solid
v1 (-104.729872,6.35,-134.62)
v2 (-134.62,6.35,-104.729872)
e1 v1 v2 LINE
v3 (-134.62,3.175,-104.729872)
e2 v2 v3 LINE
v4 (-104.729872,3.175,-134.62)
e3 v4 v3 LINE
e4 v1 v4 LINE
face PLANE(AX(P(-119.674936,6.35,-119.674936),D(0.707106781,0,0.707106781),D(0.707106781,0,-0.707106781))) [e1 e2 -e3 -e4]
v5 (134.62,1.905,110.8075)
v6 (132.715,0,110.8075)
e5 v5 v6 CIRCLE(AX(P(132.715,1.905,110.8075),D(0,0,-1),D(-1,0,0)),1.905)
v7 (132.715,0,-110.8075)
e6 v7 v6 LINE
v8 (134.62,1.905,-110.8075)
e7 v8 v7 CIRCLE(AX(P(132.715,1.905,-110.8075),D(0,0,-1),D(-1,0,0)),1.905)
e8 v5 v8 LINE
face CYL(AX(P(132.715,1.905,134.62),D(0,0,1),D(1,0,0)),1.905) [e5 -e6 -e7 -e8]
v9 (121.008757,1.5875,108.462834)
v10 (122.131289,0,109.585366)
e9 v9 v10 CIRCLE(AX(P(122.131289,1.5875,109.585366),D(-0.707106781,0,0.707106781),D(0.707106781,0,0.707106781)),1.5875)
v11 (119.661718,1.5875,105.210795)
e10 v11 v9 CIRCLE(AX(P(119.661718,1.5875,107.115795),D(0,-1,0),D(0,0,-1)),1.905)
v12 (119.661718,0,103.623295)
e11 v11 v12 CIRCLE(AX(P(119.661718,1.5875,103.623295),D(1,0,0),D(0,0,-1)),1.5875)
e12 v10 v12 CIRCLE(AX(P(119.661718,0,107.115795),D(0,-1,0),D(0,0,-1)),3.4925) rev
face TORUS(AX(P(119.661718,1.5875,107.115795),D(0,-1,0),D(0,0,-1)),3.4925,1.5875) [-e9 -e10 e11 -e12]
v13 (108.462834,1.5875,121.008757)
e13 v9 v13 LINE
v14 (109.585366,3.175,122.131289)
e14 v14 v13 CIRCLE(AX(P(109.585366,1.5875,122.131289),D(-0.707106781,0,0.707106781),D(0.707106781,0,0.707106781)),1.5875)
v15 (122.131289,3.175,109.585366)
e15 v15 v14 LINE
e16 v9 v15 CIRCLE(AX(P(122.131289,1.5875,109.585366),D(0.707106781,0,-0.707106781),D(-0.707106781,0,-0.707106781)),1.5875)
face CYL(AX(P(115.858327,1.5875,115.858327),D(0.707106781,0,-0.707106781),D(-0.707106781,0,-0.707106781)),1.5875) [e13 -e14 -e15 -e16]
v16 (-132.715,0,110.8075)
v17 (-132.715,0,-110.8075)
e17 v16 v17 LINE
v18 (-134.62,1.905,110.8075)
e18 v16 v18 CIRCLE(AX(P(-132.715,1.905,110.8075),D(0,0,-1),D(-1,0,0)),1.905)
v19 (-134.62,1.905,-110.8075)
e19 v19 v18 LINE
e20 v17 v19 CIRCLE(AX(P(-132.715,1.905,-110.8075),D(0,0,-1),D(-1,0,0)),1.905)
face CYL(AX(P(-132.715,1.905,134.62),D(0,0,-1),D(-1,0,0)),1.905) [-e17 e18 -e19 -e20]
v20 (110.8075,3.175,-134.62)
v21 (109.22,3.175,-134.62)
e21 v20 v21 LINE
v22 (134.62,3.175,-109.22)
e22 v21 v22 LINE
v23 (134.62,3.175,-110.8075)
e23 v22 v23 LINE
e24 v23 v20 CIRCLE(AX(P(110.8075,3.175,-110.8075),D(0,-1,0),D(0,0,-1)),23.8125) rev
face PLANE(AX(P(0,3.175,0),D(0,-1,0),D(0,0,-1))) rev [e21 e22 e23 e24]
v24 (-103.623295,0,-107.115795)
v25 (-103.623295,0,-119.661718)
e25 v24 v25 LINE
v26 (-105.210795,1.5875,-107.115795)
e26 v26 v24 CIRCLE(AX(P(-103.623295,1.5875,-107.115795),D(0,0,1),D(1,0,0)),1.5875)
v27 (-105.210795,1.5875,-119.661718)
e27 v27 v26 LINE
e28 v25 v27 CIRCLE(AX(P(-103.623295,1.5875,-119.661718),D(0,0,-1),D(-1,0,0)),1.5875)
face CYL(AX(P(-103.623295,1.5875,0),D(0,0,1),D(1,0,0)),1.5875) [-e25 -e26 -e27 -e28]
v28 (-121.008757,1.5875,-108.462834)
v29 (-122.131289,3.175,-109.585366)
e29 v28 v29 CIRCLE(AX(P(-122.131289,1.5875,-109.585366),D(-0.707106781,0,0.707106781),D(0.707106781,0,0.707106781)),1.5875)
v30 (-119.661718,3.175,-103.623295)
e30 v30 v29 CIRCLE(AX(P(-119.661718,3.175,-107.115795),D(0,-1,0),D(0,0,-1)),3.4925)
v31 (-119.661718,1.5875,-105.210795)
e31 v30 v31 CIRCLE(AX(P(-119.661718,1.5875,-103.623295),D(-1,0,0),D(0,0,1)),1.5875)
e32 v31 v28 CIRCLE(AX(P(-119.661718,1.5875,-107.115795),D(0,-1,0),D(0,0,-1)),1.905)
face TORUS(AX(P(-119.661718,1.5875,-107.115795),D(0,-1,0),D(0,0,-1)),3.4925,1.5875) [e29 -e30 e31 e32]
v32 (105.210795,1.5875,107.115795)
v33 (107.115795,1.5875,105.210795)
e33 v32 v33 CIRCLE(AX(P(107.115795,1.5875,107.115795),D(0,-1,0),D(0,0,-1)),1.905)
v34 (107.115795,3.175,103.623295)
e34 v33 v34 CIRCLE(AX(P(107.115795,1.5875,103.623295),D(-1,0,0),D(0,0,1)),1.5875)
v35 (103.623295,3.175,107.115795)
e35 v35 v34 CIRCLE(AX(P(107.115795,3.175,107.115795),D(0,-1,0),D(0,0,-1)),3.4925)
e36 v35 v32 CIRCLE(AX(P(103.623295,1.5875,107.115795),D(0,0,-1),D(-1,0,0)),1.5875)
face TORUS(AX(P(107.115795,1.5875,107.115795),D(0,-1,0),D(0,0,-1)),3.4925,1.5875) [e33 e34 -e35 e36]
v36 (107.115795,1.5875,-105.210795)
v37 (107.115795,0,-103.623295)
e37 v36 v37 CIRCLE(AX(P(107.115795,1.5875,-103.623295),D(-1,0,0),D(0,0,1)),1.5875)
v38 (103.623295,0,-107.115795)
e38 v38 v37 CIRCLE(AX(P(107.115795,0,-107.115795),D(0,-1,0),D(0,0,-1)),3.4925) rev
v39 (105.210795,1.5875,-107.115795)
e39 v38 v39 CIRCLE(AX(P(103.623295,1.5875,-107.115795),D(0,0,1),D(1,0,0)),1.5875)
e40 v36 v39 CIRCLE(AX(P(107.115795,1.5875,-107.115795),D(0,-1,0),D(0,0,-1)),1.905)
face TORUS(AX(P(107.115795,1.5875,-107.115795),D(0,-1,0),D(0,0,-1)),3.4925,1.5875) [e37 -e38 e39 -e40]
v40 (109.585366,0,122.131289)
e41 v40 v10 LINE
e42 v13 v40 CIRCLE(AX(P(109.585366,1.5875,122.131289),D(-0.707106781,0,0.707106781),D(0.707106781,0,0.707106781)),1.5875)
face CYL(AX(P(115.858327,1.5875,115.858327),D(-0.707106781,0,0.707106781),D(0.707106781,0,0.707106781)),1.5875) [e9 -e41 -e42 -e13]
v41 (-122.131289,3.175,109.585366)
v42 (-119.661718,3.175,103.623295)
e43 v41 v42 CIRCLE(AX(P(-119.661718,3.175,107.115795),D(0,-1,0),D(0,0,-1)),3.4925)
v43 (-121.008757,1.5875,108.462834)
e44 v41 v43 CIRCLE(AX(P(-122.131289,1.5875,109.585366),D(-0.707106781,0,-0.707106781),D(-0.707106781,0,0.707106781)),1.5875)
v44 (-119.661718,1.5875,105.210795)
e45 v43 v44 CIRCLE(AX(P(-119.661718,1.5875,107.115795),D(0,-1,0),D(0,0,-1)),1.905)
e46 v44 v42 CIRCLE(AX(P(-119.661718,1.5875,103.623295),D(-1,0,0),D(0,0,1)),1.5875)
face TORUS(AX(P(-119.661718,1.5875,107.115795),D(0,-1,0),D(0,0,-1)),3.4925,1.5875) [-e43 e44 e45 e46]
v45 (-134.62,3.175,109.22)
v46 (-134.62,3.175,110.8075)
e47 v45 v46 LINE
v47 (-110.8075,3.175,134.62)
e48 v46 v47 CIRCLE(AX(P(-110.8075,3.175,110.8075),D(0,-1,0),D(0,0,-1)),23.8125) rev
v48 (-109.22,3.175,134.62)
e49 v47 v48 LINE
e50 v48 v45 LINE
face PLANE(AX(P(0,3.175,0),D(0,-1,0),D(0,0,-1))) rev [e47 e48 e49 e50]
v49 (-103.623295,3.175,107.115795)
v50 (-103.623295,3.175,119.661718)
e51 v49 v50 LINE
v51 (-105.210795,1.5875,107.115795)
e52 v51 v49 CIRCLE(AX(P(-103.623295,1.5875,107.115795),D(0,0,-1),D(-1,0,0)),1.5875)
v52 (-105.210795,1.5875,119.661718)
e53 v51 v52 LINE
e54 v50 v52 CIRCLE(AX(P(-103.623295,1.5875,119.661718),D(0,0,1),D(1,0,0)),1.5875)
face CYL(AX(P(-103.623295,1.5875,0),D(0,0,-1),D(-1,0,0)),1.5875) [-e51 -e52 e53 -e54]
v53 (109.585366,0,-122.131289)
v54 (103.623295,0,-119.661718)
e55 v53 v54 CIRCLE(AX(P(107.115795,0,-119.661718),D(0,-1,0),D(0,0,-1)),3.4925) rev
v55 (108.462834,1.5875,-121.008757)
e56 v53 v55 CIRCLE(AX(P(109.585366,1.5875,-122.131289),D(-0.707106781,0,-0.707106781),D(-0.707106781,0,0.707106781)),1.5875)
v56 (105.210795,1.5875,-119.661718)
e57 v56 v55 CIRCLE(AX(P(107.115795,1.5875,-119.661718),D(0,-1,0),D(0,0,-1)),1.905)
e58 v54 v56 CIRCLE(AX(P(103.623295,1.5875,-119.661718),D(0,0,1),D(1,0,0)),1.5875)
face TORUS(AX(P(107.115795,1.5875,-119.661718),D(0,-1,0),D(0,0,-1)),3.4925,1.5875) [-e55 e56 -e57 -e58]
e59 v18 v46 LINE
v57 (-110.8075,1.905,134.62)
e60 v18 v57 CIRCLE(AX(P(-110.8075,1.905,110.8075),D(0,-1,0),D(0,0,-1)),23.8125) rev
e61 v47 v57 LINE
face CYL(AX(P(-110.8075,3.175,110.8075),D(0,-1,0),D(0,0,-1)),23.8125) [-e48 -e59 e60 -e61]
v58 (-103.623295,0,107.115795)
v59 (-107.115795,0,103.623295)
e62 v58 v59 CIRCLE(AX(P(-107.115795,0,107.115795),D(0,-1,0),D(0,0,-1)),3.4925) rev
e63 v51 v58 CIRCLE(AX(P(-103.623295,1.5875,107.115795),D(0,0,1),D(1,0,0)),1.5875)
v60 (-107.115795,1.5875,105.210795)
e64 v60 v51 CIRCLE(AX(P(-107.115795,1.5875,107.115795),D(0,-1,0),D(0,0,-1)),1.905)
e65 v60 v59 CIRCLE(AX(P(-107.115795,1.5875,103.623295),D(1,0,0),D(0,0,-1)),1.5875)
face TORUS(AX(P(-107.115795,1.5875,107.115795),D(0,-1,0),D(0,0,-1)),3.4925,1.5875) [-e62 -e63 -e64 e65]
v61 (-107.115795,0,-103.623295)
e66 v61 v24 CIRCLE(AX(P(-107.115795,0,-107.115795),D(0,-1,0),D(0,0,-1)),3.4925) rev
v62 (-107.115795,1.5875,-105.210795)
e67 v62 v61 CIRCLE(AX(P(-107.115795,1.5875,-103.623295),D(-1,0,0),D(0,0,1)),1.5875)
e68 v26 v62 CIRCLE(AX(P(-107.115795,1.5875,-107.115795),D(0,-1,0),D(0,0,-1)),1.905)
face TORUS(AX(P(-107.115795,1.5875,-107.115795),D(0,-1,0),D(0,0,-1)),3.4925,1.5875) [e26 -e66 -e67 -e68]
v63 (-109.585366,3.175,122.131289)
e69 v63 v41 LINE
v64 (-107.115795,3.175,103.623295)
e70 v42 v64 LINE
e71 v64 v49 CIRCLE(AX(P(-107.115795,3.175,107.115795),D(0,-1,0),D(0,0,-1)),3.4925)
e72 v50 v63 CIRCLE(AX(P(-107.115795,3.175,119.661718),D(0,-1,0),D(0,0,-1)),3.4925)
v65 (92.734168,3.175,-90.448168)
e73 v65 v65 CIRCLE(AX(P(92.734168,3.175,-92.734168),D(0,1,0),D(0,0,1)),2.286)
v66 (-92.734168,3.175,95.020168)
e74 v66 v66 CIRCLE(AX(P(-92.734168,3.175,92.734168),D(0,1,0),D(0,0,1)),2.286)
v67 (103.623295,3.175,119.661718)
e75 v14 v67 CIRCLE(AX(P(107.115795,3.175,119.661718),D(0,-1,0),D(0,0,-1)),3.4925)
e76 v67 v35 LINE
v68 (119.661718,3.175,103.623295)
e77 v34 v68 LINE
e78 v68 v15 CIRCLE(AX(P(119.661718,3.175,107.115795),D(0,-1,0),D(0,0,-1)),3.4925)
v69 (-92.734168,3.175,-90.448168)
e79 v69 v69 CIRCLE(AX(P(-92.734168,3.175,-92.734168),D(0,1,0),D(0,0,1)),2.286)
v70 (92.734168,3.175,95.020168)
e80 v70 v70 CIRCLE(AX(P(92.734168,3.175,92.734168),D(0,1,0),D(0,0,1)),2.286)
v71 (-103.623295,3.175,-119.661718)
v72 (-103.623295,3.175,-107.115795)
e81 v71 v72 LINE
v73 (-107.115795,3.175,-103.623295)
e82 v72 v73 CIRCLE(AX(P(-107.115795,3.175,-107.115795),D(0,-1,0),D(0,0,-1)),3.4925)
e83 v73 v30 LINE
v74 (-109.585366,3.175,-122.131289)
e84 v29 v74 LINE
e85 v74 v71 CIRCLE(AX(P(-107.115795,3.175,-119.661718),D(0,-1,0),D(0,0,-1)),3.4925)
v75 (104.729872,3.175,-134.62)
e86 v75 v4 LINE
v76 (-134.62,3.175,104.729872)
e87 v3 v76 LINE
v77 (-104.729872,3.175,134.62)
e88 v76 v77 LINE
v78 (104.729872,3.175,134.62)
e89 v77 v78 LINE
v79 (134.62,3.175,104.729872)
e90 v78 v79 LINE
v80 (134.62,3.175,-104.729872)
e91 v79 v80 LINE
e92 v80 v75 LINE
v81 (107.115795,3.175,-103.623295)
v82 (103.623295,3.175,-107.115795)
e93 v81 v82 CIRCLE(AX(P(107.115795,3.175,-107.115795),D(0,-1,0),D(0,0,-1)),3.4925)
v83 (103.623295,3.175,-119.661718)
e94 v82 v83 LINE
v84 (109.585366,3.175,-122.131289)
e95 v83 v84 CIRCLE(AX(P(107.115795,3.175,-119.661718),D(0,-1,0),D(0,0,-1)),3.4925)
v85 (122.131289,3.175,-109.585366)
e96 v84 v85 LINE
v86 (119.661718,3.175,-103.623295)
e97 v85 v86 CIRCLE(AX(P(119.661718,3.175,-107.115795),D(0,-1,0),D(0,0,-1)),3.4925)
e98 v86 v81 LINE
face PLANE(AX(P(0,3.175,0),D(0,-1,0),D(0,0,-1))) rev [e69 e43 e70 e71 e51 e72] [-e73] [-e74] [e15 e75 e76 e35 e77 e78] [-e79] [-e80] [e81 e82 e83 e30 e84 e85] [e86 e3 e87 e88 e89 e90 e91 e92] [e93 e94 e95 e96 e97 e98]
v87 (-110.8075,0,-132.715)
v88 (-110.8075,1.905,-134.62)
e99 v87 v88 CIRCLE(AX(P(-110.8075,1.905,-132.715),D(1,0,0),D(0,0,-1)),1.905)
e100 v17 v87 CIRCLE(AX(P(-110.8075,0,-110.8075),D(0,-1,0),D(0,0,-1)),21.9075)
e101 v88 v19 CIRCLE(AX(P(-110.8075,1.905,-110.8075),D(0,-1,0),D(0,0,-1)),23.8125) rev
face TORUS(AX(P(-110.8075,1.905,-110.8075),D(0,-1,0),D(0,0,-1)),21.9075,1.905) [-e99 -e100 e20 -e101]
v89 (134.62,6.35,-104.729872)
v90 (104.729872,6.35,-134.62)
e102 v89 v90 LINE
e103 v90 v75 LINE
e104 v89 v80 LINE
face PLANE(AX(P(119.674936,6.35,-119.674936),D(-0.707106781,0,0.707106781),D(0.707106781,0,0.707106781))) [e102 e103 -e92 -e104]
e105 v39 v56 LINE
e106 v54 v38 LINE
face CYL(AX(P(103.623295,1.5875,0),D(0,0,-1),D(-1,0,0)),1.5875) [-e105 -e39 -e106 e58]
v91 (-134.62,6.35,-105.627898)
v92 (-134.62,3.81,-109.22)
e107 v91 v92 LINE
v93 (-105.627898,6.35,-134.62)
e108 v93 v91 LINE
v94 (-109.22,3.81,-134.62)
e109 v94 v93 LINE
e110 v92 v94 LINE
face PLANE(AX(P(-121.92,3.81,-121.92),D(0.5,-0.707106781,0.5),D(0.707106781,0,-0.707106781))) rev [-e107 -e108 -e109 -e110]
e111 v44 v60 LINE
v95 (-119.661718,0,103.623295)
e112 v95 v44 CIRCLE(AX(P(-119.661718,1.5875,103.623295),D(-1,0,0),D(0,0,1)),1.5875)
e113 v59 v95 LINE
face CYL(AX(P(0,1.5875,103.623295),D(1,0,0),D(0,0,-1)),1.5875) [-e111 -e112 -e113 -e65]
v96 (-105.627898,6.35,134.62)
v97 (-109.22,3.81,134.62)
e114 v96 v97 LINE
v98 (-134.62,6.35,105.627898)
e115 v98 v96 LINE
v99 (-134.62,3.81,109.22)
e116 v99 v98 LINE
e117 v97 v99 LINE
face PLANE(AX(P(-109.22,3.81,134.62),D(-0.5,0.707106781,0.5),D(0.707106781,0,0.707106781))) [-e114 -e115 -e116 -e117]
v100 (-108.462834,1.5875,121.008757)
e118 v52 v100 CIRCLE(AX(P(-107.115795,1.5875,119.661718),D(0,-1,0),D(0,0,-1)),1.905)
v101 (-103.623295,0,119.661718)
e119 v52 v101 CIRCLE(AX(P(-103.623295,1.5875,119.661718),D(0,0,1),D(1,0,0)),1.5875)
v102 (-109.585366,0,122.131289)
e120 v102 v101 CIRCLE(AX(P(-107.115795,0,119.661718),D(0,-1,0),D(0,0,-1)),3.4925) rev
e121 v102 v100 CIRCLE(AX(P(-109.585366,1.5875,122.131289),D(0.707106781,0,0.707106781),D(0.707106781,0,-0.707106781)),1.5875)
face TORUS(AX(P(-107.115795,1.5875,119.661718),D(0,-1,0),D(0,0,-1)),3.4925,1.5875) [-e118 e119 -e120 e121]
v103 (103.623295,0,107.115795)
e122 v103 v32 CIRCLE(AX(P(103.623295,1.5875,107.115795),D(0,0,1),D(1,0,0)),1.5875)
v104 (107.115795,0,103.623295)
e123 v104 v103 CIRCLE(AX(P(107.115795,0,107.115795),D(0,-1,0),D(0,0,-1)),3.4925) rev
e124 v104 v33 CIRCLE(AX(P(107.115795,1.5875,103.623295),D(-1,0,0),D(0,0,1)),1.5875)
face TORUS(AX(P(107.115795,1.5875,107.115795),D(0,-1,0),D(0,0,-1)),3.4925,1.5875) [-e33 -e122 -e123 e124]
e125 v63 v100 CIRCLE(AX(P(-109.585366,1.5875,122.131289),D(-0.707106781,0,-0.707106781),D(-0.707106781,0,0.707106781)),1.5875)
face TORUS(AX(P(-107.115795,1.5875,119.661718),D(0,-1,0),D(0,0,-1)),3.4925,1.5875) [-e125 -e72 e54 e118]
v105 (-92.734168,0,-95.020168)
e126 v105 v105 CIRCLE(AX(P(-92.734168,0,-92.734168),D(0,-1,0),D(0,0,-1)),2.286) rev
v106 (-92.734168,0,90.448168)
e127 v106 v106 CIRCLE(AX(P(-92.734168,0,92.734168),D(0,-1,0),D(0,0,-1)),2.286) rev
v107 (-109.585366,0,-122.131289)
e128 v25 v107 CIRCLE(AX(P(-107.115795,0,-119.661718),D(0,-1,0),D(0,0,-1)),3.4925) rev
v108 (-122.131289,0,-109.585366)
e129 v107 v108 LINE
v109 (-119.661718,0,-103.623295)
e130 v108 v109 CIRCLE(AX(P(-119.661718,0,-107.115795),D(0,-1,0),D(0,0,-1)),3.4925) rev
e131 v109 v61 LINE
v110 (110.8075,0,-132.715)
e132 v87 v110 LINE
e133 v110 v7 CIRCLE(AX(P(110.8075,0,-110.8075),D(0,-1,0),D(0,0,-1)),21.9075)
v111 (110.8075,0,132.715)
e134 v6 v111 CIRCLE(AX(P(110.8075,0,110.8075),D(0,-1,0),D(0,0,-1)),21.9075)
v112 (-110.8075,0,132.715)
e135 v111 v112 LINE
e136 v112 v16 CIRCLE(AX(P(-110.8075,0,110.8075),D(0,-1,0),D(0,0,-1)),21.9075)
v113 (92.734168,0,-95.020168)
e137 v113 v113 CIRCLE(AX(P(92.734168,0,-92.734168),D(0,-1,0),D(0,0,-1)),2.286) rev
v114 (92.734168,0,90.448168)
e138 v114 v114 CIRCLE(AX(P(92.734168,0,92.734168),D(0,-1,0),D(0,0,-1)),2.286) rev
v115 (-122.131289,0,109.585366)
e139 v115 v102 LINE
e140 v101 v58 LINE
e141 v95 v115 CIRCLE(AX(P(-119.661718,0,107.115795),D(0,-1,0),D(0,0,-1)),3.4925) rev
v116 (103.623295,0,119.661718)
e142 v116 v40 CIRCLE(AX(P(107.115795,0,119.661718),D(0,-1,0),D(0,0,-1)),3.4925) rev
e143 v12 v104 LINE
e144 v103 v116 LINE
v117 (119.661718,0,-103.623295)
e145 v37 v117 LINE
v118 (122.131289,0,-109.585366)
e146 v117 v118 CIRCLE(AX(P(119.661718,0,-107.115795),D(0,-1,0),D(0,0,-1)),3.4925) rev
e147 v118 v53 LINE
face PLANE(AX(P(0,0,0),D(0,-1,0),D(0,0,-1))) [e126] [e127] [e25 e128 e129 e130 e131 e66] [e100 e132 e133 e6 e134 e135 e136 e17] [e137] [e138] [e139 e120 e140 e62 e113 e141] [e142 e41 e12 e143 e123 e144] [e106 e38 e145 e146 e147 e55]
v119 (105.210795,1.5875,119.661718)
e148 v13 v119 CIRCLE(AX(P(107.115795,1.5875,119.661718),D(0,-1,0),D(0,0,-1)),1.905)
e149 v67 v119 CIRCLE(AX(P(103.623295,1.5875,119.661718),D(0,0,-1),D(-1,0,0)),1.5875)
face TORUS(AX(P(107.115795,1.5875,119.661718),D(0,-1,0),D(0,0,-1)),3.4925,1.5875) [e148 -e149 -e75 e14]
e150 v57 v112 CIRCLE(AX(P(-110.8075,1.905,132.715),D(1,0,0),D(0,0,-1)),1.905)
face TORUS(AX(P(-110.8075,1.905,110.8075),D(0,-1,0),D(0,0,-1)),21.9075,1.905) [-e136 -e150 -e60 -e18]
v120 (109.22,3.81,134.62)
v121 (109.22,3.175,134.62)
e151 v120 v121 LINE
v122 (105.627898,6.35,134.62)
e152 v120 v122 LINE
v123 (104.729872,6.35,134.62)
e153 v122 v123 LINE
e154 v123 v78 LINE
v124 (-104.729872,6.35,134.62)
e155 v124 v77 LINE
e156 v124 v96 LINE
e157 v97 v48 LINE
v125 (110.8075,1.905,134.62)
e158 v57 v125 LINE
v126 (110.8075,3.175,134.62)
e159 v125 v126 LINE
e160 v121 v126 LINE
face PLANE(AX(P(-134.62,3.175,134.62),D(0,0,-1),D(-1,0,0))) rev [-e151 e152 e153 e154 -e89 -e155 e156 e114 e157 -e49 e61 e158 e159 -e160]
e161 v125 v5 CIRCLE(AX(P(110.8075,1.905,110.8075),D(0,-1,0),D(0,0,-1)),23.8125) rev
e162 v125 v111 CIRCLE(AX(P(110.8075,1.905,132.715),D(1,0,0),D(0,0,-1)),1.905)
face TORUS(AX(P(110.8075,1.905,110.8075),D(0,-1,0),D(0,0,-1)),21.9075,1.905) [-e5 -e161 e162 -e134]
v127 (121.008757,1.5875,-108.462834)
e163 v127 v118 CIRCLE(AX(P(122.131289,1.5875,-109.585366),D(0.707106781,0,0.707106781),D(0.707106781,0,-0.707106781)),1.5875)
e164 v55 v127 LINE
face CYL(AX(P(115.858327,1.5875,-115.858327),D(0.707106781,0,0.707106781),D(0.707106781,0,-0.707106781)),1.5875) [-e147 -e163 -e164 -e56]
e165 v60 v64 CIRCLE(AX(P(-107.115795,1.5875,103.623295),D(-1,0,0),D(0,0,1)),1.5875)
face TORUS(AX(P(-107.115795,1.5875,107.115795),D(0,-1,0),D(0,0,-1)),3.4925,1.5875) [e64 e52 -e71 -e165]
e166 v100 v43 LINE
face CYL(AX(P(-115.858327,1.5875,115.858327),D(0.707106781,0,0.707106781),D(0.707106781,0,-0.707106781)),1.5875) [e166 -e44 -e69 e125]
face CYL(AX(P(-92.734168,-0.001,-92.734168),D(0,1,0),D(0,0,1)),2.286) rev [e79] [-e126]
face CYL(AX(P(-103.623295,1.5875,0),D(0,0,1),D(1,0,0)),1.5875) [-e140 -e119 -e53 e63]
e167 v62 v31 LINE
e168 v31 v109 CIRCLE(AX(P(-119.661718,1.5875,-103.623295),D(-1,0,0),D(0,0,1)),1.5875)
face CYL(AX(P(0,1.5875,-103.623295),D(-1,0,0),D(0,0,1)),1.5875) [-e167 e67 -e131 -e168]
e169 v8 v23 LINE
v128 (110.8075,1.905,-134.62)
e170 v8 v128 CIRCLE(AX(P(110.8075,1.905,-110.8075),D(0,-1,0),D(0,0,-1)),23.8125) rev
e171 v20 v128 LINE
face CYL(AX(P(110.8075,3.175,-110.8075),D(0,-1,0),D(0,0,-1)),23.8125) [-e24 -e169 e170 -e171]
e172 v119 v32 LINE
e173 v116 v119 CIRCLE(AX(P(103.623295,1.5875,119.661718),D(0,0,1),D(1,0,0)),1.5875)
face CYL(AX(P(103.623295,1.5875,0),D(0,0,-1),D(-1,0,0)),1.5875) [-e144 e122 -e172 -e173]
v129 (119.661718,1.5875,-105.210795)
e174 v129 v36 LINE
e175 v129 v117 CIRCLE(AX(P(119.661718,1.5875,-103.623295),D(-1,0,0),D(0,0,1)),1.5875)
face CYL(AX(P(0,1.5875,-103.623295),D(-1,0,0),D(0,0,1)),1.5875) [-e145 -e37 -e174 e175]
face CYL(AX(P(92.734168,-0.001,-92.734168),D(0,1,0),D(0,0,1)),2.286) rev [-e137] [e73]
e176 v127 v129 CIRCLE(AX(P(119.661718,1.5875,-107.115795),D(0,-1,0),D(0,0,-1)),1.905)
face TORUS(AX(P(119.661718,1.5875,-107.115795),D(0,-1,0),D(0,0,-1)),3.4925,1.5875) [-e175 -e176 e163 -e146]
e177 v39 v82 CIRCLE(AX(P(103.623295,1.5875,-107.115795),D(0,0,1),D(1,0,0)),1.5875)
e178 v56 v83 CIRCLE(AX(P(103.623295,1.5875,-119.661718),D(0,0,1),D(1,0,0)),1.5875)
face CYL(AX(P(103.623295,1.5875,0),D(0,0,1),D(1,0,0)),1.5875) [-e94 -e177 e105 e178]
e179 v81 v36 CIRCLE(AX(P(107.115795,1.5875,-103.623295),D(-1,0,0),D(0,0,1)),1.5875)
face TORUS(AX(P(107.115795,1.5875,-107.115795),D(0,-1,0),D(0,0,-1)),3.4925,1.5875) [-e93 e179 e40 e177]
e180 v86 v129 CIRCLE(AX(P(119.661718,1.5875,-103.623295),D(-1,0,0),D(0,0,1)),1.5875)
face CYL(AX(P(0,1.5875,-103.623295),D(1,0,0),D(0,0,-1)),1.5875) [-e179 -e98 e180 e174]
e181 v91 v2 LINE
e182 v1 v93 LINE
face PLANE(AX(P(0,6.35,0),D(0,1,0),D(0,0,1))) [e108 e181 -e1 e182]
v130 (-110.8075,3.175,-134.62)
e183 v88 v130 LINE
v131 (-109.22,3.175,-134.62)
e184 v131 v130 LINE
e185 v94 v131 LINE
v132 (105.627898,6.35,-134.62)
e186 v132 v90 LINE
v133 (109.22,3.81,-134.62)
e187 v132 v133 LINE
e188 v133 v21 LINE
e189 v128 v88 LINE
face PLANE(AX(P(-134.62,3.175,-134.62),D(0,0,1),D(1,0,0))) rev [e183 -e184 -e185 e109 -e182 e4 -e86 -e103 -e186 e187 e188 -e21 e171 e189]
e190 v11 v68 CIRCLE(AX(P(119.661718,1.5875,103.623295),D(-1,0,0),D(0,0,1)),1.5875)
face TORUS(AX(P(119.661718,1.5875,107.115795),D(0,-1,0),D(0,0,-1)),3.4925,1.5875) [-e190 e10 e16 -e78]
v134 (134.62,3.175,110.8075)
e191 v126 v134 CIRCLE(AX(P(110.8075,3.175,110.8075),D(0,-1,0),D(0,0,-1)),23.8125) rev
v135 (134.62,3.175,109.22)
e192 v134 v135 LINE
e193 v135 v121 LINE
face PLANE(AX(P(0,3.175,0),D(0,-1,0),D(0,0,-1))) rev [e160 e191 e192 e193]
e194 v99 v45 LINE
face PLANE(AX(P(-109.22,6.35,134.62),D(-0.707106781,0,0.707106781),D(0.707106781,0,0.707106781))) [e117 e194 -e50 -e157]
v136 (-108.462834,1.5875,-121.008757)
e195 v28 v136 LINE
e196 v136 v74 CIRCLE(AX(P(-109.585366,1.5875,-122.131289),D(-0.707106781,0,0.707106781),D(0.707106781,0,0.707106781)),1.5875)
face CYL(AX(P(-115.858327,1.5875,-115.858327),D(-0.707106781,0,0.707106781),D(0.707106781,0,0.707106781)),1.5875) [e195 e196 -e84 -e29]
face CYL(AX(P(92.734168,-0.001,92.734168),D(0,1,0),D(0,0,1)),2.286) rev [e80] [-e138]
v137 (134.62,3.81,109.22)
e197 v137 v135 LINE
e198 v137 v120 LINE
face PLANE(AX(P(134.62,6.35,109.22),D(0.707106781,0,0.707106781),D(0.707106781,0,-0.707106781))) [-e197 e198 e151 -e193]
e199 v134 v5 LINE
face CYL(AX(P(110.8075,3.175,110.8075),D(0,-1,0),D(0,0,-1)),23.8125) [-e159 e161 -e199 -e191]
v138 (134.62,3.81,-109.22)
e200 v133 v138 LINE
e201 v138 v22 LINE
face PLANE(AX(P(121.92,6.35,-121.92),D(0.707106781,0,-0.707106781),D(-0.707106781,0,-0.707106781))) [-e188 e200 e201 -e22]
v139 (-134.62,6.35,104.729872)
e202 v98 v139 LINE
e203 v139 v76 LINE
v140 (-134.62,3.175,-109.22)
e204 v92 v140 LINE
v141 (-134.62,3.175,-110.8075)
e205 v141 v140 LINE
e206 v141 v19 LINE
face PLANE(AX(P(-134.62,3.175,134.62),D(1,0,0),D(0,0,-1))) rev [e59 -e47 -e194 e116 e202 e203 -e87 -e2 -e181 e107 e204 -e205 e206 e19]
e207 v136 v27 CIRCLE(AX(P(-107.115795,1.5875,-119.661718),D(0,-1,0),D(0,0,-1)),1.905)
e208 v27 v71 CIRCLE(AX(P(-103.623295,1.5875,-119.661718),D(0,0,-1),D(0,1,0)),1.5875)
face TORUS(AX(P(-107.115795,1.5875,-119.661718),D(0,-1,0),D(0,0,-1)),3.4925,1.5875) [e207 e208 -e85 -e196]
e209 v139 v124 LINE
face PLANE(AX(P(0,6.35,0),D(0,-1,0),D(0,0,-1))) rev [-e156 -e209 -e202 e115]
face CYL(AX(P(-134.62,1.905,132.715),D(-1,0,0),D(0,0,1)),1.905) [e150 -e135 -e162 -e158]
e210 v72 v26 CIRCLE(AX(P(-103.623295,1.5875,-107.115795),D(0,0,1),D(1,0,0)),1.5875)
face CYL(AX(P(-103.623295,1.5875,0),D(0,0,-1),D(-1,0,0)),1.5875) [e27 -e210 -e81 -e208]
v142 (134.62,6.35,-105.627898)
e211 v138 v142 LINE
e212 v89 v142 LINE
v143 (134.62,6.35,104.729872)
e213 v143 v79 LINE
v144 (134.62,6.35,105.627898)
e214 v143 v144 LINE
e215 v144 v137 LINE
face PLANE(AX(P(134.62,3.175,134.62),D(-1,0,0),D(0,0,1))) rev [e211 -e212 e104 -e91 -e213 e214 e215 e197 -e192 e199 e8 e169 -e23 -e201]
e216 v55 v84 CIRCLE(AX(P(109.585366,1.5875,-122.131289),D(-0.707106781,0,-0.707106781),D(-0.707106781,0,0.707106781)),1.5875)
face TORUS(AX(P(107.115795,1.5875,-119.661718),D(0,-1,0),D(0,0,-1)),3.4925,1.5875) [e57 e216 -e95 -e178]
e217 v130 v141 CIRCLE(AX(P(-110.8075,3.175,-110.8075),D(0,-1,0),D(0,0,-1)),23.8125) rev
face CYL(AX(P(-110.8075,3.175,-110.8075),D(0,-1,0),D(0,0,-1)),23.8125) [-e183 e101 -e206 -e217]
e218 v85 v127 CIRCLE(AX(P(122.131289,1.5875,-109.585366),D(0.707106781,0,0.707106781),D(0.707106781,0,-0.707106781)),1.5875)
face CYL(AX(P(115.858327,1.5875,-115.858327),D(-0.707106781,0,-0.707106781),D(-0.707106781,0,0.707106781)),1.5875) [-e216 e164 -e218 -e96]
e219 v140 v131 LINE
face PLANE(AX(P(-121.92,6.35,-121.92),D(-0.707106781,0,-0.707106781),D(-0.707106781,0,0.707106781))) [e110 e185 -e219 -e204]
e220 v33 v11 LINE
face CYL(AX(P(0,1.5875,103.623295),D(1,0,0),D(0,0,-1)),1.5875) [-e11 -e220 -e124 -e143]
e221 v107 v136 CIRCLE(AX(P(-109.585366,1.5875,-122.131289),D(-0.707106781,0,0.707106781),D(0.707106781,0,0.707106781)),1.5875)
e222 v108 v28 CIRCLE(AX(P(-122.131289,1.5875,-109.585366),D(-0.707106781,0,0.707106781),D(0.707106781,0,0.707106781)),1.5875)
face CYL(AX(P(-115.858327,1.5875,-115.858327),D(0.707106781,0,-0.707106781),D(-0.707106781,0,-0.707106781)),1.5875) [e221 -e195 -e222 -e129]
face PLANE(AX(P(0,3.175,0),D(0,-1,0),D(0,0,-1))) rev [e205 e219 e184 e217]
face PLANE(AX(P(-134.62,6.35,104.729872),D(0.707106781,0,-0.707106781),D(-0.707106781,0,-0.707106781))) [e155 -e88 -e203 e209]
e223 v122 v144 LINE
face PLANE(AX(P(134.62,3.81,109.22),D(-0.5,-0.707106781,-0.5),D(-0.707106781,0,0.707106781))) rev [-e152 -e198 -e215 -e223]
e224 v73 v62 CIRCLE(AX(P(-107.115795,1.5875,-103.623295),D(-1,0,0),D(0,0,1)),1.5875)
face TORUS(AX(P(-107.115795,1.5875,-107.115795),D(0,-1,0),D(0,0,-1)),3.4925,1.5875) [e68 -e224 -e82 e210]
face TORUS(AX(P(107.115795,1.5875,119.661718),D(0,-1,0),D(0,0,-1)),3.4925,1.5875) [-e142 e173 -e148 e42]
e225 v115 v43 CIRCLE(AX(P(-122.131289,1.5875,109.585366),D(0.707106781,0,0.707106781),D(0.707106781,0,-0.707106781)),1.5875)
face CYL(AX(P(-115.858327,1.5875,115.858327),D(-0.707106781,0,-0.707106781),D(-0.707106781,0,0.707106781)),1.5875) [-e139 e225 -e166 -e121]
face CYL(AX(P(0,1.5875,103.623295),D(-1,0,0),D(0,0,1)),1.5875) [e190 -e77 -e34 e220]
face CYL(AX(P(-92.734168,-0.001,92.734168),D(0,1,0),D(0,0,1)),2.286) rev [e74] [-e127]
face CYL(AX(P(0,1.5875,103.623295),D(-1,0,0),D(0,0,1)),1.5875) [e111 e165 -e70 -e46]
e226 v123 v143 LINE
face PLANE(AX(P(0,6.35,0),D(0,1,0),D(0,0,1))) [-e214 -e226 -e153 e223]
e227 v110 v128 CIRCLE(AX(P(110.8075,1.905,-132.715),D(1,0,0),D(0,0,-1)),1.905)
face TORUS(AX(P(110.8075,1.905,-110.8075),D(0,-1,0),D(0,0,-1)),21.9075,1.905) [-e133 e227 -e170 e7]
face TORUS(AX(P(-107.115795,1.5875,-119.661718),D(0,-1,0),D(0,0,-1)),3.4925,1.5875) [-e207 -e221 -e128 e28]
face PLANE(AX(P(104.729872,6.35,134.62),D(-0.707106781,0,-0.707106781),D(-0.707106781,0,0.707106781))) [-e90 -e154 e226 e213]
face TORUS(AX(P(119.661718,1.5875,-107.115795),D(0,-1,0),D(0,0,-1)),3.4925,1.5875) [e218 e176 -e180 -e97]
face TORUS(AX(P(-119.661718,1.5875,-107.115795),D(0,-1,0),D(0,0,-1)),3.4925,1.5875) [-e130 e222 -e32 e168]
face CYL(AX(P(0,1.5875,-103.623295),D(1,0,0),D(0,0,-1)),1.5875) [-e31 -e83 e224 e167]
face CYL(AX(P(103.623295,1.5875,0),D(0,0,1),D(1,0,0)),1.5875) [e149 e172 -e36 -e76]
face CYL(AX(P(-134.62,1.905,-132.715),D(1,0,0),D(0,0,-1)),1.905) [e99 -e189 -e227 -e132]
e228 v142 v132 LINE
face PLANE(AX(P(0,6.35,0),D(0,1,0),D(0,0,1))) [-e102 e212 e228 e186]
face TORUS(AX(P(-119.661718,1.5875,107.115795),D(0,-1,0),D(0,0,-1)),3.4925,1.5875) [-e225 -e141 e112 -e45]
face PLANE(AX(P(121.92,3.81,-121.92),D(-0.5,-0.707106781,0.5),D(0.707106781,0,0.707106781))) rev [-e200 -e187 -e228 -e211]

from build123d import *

# Parameters (mm, degrees)
SKETCH1_W           = 269.24
SKETCH1_H           = 269.24
BOSS_EXTRUDE1_DEPTH = 3.175
FILLET1_R           = 23.8125
FILLET2_R           = 1.905
BOSS_EXTRUDE2_DEPTH = 3.175
CUT_EXTRUDE4_REACH  = 192.408
SKETCH8_R           = 2.286
CHAMFER1_SIZE       = 2.54
CUT_EXTRUDE5_REACH  = 192.408
FILLET3_R           = 1.905
FILLET4_R           = 1.5875
FILLET5_R           = 1.5875


with BuildPart() as part:
    # Sketch1 → Boss-Extrude1 (new body)
    with BuildSketch(Plane(origin=(0, 0, 0), x_dir=(1, 0, 0), z_dir=(0, 1, 0))):
        Rectangle(SKETCH1_W, SKETCH1_H)
    extrude(amount=BOSS_EXTRUDE1_DEPTH)

    # Fillet1
    fillet1_edges = [part.edges().sort_by_distance(p)[0] for p in [
        (134.62, 1.5875, 134.62),
        (-134.62, 1.5875, 134.62),
        (-134.62, 1.5875, -134.62),
        (134.62, 1.5875, -134.62),
    ]]
    fillet(fillet1_edges, radius=FILLET1_R)

    # Fillet2
    fillet2_edges = [part.edges().sort_by_distance(p)[0] for p in [
        (134.62, 0, 0),
        (0, 0, 134.62),
        (-134.62, 0, 0),
        (0, 0, -134.62),
        (-127.645480227, 0, 127.645480227),
        (-127.645480227, 0, -127.645480227),
        (127.645480227, 0, -127.645480227),
        (127.645480227, 0, 127.645480227),
    ]]
    fillet(fillet2_edges, radius=FILLET2_R)

    # Sketch9 → Boss-Extrude2 (add)
    with BuildSketch(Plane(origin=(0, 3.175, 0), x_dir=(1, 0, 0), z_dir=(0, 1, 0))):
        Polygon((-134.62, 104.729871939), (-104.729871939, 134.62), (-109.22, 134.62), (-134.62, 109.22), align=None)
        Polygon((104.729871939, 134.62), (134.62, 104.729871939), (134.62, 109.22), (109.22, 134.62), align=None)
        Polygon((-109.22, -134.62), (-134.62, -109.22), (-134.62, -104.729871939), (-104.729871939, -134.62), align=None)
        Polygon((104.729871939, -134.62), (134.62, -104.729871939), (134.62, -109.22), (109.22, -134.62), align=None)
    extrude(amount=BOSS_EXTRUDE2_DEPTH)

    # Sketch8 → Cut-Extrude4 (cut, up to next)
    with BuildSketch(Plane(origin=(0, 3.175, 0), x_dir=(1, 0, 0), z_dir=(0, 1, 0)), mode=Mode.PRIVATE) as cut_extrude4_sk1:
        with Locations(Location((-92.734167607, -92.734167607, 0), (0, 0, 270))):
            Circle(SKETCH8_R)
    cut_extrude4_tool1 = extrude(cut_extrude4_sk1.sketch, amount=-CUT_EXTRUDE4_REACH, mode=Mode.PRIVATE) & part.part
    # Sketch8 → Cut-Extrude4 (cut, up to next)
    with BuildSketch(Plane(origin=(0, 3.175, 0), x_dir=(1, 0, 0), z_dir=(0, 1, 0)), mode=Mode.PRIVATE) as cut_extrude4_sk2:
        with Locations(Location((92.734167607, -92.734167607, 0), (0, 0, 270))):
            Circle(SKETCH8_R)
    cut_extrude4_tool2 = extrude(cut_extrude4_sk2.sketch, amount=-CUT_EXTRUDE4_REACH, mode=Mode.PRIVATE) & part.part
    # Sketch8 → Cut-Extrude4 (cut, up to next)
    with BuildSketch(Plane(origin=(0, 3.175, 0), x_dir=(1, 0, 0), z_dir=(0, 1, 0)), mode=Mode.PRIVATE) as cut_extrude4_sk3:
        with Locations(Location((-92.734167607, 92.734167607, 0), (0, 0, 270))):
            Circle(SKETCH8_R)
    cut_extrude4_tool3 = extrude(cut_extrude4_sk3.sketch, amount=-CUT_EXTRUDE4_REACH, mode=Mode.PRIVATE) & part.part
    # Sketch8 → Cut-Extrude4 (cut, up to next)
    with BuildSketch(Plane(origin=(0, 3.175, 0), x_dir=(1, 0, 0), z_dir=(0, 1, 0)), mode=Mode.PRIVATE) as cut_extrude4_sk4:
        with Locations(Location((92.734167607, 92.734167607, 0), (0, 0, 270))):
            Circle(SKETCH8_R)
    cut_extrude4_tool4 = extrude(cut_extrude4_sk4.sketch, amount=-CUT_EXTRUDE4_REACH, mode=Mode.PRIVATE) & part.part
    add(cut_extrude4_tool1.solids().sort_by_distance((-92.734168, 3.175, 92.734168))[0], mode=Mode.SUBTRACT)
    add(cut_extrude4_tool2.solids().sort_by_distance((92.734168, 3.175, 92.734168))[0], mode=Mode.SUBTRACT)
    add(cut_extrude4_tool3.solids().sort_by_distance((-92.734168, 3.175, -92.734168))[0], mode=Mode.SUBTRACT)
    add(cut_extrude4_tool4.solids().sort_by_distance((92.734168, 3.175, -92.734168))[0], mode=Mode.SUBTRACT)

    # Chamfer1
    chamfer1_edges = [part.edges().sort_by_distance(p)[0] for p in [
        (121.92, 6.35, 121.92),
        (-121.92, 6.35, -121.92),
        (121.92, 6.35, -121.92),
        (-121.92, 6.35, 121.92),
    ]]
    chamfer(chamfer1_edges, length=CHAMFER1_SIZE)

    # Sketch10 → Cut-Extrude5 (cut, up to next)
    with BuildSketch(Plane(origin=(0, 3.175, 0), x_dir=(1, 0, 0), z_dir=(0, 1, 0)), mode=Mode.PRIVATE) as cut_extrude5_sk1:
        Polygon((-124.260795103, -105.210795103), (-105.210795103, -124.260795103), (-105.210795103, -105.210795103), align=None)
    cut_extrude5_tool1 = extrude(cut_extrude5_sk1.sketch, amount=-CUT_EXTRUDE5_REACH, mode=Mode.PRIVATE) & part.part
    # Sketch10 → Cut-Extrude5 (cut, up to next)
    with BuildSketch(Plane(origin=(0, 3.175, 0), x_dir=(1, 0, 0), z_dir=(0, 1, 0)), mode=Mode.PRIVATE) as cut_extrude5_sk2:
        Polygon((-105.210795103, 105.210795103), (-105.210795103, 124.260795103), (-124.260795103, 105.210795103), align=None)
    cut_extrude5_tool2 = extrude(cut_extrude5_sk2.sketch, amount=-CUT_EXTRUDE5_REACH, mode=Mode.PRIVATE) & part.part
    # Sketch10 → Cut-Extrude5 (cut, up to next)
    with BuildSketch(Plane(origin=(0, 3.175, 0), x_dir=(1, 0, 0), z_dir=(0, 1, 0)), mode=Mode.PRIVATE) as cut_extrude5_sk3:
        Polygon((105.210795103, 105.210795103), (124.260795103, 105.210795103), (105.210795103, 124.260795103), align=None)
    cut_extrude5_tool3 = extrude(cut_extrude5_sk3.sketch, amount=-CUT_EXTRUDE5_REACH, mode=Mode.PRIVATE) & part.part
    # Sketch10 → Cut-Extrude5 (cut, up to next)
    with BuildSketch(Plane(origin=(0, 3.175, 0), x_dir=(1, 0, 0), z_dir=(0, 1, 0)), mode=Mode.PRIVATE) as cut_extrude5_sk4:
        Polygon((105.210795103, -105.210795103), (105.210795103, -124.260795103), (124.260795103, -105.210795103), align=None)
    cut_extrude5_tool4 = extrude(cut_extrude5_sk4.sketch, amount=-CUT_EXTRUDE5_REACH, mode=Mode.PRIVATE) & part.part
    add(cut_extrude5_tool1.solids().sort_by_distance((-111.560795, 3.175, 111.560795))[0], mode=Mode.SUBTRACT)
    add(cut_extrude5_tool2.solids().sort_by_distance((-111.560795, 3.175, -111.560795))[0], mode=Mode.SUBTRACT)
    add(cut_extrude5_tool3.solids().sort_by_distance((111.560795, 3.175, -111.560795))[0], mode=Mode.SUBTRACT)
    add(cut_extrude5_tool4.solids().sort_by_distance((111.560795, 3.175, 111.560795))[0], mode=Mode.SUBTRACT)

    # Fillet3
    fillet3_edges = [part.edges().sort_by_distance(p)[0] for p in [
        (105.210795103, 1.5875, 124.260795103),
        (105.210795103, 1.5875, 105.210795103),
        (124.260795103, 1.5875, 105.210795103),
        (124.260795103, 1.5875, -105.210795103),
        (105.210795103, 1.5875, -105.210795103),
        (105.210795103, 1.5875, -124.260795103),
        (-105.210795103, 1.5875, -124.260795103),
        (-105.210795103, 1.5875, -105.210795103),
        (-124.260795103, 1.5875, -105.210795103),
        (-105.210795103, 1.5875, 124.260795103),
        (-124.260795103, 1.5875, 105.210795103),
        (-105.210795103, 1.5875, 105.210795103),
    ]]
    fillet(fillet3_edges, radius=FILLET3_R)

    # Fillet4
    fillet4_edges = [part.edges().sort_by_distance(p)[0] for p in [
        (105.210795103, 0, 113.388756685),
        (113.388756685, 0, 105.210795103),
        (114.735795103, 0, 114.735795103),
        (105.210795103, 0, -113.388756685),
        (114.735795103, 0, -114.735795103),
        (113.388756685, 0, -105.210795103),
        (-114.735795103, 0, -114.735795103),
        (-105.210795103, 0, -113.388756685),
        (-113.388756685, 0, -105.210795103),
        (-113.388756685, 0, 105.210795103),
        (-105.210795103, 0, 113.388756685),
        (-114.735795103, 0, 114.735795103),
        (105.768756685, 0, 105.768756685),
        (121.421708776, 0, 106.386783164),
        (106.386783164, 0, 121.421708776),
        (106.386783164, 0, -121.421708776),
        (121.421708776, 0, -106.386783164),
        (105.768756685, 0, -105.768756685),
        (-106.386783164, 0, -121.421708776),
        (-105.768756685, 0, -105.768756685),
        (-121.421708776, 0, -106.386783164),
        (-105.768756685, 0, 105.768756685),
        (-106.386783164, 0, 121.421708776),
        (-121.421708776, 0, 106.386783164),
    ]]
    fillet(fillet4_edges, radius=FILLET4_R)

    # Fillet5
    fillet5_edges = [part.edges().sort_by_distance(p)[0] for p in [
        (105.768756685, 3.175, 105.768756685),
        (113.388756685, 3.175, 105.210795103),
        (121.421708776, 3.175, 106.386783164),
        (114.735795103, 3.175, 114.735795103),
        (106.386783164, 3.175, 121.421708776),
        (105.768756685, 3.175, -105.768756685),
        (105.210795103, 3.175, -113.388756685),
        (106.386783164, 3.175, -121.421708776),
        (114.735795103, 3.175, -114.735795103),
        (121.421708776, 3.175, -106.386783164),
        (-121.421708776, 3.175, -106.386783164),
        (-114.735795103, 3.175, -114.735795103),
        (-106.386783164, 3.175, -121.421708776),
        (-105.210795103, 3.175, -113.388756685),
        (-105.768756685, 3.175, -105.768756685),
        (-121.421708776, 3.175, 106.386783164),
        (-113.388756685, 3.175, 105.210795103),
        (-105.768756685, 3.175, 105.768756685),
        (-105.210795103, 3.175, 113.388756685),
        (-106.386783164, 3.175, 121.421708776),
        (105.210795103, 3.175, 113.388756685),
        (113.388756685, 3.175, -105.210795103),
        (-113.388756685, 3.175, -105.210795103),
        (-114.735795103, 3.175, 114.735795103),
    ]]
    fillet(fillet5_edges, radius=FILLET5_R - 0.0001)  # a hair under: the kernel refuses the full size


solid = part.part
